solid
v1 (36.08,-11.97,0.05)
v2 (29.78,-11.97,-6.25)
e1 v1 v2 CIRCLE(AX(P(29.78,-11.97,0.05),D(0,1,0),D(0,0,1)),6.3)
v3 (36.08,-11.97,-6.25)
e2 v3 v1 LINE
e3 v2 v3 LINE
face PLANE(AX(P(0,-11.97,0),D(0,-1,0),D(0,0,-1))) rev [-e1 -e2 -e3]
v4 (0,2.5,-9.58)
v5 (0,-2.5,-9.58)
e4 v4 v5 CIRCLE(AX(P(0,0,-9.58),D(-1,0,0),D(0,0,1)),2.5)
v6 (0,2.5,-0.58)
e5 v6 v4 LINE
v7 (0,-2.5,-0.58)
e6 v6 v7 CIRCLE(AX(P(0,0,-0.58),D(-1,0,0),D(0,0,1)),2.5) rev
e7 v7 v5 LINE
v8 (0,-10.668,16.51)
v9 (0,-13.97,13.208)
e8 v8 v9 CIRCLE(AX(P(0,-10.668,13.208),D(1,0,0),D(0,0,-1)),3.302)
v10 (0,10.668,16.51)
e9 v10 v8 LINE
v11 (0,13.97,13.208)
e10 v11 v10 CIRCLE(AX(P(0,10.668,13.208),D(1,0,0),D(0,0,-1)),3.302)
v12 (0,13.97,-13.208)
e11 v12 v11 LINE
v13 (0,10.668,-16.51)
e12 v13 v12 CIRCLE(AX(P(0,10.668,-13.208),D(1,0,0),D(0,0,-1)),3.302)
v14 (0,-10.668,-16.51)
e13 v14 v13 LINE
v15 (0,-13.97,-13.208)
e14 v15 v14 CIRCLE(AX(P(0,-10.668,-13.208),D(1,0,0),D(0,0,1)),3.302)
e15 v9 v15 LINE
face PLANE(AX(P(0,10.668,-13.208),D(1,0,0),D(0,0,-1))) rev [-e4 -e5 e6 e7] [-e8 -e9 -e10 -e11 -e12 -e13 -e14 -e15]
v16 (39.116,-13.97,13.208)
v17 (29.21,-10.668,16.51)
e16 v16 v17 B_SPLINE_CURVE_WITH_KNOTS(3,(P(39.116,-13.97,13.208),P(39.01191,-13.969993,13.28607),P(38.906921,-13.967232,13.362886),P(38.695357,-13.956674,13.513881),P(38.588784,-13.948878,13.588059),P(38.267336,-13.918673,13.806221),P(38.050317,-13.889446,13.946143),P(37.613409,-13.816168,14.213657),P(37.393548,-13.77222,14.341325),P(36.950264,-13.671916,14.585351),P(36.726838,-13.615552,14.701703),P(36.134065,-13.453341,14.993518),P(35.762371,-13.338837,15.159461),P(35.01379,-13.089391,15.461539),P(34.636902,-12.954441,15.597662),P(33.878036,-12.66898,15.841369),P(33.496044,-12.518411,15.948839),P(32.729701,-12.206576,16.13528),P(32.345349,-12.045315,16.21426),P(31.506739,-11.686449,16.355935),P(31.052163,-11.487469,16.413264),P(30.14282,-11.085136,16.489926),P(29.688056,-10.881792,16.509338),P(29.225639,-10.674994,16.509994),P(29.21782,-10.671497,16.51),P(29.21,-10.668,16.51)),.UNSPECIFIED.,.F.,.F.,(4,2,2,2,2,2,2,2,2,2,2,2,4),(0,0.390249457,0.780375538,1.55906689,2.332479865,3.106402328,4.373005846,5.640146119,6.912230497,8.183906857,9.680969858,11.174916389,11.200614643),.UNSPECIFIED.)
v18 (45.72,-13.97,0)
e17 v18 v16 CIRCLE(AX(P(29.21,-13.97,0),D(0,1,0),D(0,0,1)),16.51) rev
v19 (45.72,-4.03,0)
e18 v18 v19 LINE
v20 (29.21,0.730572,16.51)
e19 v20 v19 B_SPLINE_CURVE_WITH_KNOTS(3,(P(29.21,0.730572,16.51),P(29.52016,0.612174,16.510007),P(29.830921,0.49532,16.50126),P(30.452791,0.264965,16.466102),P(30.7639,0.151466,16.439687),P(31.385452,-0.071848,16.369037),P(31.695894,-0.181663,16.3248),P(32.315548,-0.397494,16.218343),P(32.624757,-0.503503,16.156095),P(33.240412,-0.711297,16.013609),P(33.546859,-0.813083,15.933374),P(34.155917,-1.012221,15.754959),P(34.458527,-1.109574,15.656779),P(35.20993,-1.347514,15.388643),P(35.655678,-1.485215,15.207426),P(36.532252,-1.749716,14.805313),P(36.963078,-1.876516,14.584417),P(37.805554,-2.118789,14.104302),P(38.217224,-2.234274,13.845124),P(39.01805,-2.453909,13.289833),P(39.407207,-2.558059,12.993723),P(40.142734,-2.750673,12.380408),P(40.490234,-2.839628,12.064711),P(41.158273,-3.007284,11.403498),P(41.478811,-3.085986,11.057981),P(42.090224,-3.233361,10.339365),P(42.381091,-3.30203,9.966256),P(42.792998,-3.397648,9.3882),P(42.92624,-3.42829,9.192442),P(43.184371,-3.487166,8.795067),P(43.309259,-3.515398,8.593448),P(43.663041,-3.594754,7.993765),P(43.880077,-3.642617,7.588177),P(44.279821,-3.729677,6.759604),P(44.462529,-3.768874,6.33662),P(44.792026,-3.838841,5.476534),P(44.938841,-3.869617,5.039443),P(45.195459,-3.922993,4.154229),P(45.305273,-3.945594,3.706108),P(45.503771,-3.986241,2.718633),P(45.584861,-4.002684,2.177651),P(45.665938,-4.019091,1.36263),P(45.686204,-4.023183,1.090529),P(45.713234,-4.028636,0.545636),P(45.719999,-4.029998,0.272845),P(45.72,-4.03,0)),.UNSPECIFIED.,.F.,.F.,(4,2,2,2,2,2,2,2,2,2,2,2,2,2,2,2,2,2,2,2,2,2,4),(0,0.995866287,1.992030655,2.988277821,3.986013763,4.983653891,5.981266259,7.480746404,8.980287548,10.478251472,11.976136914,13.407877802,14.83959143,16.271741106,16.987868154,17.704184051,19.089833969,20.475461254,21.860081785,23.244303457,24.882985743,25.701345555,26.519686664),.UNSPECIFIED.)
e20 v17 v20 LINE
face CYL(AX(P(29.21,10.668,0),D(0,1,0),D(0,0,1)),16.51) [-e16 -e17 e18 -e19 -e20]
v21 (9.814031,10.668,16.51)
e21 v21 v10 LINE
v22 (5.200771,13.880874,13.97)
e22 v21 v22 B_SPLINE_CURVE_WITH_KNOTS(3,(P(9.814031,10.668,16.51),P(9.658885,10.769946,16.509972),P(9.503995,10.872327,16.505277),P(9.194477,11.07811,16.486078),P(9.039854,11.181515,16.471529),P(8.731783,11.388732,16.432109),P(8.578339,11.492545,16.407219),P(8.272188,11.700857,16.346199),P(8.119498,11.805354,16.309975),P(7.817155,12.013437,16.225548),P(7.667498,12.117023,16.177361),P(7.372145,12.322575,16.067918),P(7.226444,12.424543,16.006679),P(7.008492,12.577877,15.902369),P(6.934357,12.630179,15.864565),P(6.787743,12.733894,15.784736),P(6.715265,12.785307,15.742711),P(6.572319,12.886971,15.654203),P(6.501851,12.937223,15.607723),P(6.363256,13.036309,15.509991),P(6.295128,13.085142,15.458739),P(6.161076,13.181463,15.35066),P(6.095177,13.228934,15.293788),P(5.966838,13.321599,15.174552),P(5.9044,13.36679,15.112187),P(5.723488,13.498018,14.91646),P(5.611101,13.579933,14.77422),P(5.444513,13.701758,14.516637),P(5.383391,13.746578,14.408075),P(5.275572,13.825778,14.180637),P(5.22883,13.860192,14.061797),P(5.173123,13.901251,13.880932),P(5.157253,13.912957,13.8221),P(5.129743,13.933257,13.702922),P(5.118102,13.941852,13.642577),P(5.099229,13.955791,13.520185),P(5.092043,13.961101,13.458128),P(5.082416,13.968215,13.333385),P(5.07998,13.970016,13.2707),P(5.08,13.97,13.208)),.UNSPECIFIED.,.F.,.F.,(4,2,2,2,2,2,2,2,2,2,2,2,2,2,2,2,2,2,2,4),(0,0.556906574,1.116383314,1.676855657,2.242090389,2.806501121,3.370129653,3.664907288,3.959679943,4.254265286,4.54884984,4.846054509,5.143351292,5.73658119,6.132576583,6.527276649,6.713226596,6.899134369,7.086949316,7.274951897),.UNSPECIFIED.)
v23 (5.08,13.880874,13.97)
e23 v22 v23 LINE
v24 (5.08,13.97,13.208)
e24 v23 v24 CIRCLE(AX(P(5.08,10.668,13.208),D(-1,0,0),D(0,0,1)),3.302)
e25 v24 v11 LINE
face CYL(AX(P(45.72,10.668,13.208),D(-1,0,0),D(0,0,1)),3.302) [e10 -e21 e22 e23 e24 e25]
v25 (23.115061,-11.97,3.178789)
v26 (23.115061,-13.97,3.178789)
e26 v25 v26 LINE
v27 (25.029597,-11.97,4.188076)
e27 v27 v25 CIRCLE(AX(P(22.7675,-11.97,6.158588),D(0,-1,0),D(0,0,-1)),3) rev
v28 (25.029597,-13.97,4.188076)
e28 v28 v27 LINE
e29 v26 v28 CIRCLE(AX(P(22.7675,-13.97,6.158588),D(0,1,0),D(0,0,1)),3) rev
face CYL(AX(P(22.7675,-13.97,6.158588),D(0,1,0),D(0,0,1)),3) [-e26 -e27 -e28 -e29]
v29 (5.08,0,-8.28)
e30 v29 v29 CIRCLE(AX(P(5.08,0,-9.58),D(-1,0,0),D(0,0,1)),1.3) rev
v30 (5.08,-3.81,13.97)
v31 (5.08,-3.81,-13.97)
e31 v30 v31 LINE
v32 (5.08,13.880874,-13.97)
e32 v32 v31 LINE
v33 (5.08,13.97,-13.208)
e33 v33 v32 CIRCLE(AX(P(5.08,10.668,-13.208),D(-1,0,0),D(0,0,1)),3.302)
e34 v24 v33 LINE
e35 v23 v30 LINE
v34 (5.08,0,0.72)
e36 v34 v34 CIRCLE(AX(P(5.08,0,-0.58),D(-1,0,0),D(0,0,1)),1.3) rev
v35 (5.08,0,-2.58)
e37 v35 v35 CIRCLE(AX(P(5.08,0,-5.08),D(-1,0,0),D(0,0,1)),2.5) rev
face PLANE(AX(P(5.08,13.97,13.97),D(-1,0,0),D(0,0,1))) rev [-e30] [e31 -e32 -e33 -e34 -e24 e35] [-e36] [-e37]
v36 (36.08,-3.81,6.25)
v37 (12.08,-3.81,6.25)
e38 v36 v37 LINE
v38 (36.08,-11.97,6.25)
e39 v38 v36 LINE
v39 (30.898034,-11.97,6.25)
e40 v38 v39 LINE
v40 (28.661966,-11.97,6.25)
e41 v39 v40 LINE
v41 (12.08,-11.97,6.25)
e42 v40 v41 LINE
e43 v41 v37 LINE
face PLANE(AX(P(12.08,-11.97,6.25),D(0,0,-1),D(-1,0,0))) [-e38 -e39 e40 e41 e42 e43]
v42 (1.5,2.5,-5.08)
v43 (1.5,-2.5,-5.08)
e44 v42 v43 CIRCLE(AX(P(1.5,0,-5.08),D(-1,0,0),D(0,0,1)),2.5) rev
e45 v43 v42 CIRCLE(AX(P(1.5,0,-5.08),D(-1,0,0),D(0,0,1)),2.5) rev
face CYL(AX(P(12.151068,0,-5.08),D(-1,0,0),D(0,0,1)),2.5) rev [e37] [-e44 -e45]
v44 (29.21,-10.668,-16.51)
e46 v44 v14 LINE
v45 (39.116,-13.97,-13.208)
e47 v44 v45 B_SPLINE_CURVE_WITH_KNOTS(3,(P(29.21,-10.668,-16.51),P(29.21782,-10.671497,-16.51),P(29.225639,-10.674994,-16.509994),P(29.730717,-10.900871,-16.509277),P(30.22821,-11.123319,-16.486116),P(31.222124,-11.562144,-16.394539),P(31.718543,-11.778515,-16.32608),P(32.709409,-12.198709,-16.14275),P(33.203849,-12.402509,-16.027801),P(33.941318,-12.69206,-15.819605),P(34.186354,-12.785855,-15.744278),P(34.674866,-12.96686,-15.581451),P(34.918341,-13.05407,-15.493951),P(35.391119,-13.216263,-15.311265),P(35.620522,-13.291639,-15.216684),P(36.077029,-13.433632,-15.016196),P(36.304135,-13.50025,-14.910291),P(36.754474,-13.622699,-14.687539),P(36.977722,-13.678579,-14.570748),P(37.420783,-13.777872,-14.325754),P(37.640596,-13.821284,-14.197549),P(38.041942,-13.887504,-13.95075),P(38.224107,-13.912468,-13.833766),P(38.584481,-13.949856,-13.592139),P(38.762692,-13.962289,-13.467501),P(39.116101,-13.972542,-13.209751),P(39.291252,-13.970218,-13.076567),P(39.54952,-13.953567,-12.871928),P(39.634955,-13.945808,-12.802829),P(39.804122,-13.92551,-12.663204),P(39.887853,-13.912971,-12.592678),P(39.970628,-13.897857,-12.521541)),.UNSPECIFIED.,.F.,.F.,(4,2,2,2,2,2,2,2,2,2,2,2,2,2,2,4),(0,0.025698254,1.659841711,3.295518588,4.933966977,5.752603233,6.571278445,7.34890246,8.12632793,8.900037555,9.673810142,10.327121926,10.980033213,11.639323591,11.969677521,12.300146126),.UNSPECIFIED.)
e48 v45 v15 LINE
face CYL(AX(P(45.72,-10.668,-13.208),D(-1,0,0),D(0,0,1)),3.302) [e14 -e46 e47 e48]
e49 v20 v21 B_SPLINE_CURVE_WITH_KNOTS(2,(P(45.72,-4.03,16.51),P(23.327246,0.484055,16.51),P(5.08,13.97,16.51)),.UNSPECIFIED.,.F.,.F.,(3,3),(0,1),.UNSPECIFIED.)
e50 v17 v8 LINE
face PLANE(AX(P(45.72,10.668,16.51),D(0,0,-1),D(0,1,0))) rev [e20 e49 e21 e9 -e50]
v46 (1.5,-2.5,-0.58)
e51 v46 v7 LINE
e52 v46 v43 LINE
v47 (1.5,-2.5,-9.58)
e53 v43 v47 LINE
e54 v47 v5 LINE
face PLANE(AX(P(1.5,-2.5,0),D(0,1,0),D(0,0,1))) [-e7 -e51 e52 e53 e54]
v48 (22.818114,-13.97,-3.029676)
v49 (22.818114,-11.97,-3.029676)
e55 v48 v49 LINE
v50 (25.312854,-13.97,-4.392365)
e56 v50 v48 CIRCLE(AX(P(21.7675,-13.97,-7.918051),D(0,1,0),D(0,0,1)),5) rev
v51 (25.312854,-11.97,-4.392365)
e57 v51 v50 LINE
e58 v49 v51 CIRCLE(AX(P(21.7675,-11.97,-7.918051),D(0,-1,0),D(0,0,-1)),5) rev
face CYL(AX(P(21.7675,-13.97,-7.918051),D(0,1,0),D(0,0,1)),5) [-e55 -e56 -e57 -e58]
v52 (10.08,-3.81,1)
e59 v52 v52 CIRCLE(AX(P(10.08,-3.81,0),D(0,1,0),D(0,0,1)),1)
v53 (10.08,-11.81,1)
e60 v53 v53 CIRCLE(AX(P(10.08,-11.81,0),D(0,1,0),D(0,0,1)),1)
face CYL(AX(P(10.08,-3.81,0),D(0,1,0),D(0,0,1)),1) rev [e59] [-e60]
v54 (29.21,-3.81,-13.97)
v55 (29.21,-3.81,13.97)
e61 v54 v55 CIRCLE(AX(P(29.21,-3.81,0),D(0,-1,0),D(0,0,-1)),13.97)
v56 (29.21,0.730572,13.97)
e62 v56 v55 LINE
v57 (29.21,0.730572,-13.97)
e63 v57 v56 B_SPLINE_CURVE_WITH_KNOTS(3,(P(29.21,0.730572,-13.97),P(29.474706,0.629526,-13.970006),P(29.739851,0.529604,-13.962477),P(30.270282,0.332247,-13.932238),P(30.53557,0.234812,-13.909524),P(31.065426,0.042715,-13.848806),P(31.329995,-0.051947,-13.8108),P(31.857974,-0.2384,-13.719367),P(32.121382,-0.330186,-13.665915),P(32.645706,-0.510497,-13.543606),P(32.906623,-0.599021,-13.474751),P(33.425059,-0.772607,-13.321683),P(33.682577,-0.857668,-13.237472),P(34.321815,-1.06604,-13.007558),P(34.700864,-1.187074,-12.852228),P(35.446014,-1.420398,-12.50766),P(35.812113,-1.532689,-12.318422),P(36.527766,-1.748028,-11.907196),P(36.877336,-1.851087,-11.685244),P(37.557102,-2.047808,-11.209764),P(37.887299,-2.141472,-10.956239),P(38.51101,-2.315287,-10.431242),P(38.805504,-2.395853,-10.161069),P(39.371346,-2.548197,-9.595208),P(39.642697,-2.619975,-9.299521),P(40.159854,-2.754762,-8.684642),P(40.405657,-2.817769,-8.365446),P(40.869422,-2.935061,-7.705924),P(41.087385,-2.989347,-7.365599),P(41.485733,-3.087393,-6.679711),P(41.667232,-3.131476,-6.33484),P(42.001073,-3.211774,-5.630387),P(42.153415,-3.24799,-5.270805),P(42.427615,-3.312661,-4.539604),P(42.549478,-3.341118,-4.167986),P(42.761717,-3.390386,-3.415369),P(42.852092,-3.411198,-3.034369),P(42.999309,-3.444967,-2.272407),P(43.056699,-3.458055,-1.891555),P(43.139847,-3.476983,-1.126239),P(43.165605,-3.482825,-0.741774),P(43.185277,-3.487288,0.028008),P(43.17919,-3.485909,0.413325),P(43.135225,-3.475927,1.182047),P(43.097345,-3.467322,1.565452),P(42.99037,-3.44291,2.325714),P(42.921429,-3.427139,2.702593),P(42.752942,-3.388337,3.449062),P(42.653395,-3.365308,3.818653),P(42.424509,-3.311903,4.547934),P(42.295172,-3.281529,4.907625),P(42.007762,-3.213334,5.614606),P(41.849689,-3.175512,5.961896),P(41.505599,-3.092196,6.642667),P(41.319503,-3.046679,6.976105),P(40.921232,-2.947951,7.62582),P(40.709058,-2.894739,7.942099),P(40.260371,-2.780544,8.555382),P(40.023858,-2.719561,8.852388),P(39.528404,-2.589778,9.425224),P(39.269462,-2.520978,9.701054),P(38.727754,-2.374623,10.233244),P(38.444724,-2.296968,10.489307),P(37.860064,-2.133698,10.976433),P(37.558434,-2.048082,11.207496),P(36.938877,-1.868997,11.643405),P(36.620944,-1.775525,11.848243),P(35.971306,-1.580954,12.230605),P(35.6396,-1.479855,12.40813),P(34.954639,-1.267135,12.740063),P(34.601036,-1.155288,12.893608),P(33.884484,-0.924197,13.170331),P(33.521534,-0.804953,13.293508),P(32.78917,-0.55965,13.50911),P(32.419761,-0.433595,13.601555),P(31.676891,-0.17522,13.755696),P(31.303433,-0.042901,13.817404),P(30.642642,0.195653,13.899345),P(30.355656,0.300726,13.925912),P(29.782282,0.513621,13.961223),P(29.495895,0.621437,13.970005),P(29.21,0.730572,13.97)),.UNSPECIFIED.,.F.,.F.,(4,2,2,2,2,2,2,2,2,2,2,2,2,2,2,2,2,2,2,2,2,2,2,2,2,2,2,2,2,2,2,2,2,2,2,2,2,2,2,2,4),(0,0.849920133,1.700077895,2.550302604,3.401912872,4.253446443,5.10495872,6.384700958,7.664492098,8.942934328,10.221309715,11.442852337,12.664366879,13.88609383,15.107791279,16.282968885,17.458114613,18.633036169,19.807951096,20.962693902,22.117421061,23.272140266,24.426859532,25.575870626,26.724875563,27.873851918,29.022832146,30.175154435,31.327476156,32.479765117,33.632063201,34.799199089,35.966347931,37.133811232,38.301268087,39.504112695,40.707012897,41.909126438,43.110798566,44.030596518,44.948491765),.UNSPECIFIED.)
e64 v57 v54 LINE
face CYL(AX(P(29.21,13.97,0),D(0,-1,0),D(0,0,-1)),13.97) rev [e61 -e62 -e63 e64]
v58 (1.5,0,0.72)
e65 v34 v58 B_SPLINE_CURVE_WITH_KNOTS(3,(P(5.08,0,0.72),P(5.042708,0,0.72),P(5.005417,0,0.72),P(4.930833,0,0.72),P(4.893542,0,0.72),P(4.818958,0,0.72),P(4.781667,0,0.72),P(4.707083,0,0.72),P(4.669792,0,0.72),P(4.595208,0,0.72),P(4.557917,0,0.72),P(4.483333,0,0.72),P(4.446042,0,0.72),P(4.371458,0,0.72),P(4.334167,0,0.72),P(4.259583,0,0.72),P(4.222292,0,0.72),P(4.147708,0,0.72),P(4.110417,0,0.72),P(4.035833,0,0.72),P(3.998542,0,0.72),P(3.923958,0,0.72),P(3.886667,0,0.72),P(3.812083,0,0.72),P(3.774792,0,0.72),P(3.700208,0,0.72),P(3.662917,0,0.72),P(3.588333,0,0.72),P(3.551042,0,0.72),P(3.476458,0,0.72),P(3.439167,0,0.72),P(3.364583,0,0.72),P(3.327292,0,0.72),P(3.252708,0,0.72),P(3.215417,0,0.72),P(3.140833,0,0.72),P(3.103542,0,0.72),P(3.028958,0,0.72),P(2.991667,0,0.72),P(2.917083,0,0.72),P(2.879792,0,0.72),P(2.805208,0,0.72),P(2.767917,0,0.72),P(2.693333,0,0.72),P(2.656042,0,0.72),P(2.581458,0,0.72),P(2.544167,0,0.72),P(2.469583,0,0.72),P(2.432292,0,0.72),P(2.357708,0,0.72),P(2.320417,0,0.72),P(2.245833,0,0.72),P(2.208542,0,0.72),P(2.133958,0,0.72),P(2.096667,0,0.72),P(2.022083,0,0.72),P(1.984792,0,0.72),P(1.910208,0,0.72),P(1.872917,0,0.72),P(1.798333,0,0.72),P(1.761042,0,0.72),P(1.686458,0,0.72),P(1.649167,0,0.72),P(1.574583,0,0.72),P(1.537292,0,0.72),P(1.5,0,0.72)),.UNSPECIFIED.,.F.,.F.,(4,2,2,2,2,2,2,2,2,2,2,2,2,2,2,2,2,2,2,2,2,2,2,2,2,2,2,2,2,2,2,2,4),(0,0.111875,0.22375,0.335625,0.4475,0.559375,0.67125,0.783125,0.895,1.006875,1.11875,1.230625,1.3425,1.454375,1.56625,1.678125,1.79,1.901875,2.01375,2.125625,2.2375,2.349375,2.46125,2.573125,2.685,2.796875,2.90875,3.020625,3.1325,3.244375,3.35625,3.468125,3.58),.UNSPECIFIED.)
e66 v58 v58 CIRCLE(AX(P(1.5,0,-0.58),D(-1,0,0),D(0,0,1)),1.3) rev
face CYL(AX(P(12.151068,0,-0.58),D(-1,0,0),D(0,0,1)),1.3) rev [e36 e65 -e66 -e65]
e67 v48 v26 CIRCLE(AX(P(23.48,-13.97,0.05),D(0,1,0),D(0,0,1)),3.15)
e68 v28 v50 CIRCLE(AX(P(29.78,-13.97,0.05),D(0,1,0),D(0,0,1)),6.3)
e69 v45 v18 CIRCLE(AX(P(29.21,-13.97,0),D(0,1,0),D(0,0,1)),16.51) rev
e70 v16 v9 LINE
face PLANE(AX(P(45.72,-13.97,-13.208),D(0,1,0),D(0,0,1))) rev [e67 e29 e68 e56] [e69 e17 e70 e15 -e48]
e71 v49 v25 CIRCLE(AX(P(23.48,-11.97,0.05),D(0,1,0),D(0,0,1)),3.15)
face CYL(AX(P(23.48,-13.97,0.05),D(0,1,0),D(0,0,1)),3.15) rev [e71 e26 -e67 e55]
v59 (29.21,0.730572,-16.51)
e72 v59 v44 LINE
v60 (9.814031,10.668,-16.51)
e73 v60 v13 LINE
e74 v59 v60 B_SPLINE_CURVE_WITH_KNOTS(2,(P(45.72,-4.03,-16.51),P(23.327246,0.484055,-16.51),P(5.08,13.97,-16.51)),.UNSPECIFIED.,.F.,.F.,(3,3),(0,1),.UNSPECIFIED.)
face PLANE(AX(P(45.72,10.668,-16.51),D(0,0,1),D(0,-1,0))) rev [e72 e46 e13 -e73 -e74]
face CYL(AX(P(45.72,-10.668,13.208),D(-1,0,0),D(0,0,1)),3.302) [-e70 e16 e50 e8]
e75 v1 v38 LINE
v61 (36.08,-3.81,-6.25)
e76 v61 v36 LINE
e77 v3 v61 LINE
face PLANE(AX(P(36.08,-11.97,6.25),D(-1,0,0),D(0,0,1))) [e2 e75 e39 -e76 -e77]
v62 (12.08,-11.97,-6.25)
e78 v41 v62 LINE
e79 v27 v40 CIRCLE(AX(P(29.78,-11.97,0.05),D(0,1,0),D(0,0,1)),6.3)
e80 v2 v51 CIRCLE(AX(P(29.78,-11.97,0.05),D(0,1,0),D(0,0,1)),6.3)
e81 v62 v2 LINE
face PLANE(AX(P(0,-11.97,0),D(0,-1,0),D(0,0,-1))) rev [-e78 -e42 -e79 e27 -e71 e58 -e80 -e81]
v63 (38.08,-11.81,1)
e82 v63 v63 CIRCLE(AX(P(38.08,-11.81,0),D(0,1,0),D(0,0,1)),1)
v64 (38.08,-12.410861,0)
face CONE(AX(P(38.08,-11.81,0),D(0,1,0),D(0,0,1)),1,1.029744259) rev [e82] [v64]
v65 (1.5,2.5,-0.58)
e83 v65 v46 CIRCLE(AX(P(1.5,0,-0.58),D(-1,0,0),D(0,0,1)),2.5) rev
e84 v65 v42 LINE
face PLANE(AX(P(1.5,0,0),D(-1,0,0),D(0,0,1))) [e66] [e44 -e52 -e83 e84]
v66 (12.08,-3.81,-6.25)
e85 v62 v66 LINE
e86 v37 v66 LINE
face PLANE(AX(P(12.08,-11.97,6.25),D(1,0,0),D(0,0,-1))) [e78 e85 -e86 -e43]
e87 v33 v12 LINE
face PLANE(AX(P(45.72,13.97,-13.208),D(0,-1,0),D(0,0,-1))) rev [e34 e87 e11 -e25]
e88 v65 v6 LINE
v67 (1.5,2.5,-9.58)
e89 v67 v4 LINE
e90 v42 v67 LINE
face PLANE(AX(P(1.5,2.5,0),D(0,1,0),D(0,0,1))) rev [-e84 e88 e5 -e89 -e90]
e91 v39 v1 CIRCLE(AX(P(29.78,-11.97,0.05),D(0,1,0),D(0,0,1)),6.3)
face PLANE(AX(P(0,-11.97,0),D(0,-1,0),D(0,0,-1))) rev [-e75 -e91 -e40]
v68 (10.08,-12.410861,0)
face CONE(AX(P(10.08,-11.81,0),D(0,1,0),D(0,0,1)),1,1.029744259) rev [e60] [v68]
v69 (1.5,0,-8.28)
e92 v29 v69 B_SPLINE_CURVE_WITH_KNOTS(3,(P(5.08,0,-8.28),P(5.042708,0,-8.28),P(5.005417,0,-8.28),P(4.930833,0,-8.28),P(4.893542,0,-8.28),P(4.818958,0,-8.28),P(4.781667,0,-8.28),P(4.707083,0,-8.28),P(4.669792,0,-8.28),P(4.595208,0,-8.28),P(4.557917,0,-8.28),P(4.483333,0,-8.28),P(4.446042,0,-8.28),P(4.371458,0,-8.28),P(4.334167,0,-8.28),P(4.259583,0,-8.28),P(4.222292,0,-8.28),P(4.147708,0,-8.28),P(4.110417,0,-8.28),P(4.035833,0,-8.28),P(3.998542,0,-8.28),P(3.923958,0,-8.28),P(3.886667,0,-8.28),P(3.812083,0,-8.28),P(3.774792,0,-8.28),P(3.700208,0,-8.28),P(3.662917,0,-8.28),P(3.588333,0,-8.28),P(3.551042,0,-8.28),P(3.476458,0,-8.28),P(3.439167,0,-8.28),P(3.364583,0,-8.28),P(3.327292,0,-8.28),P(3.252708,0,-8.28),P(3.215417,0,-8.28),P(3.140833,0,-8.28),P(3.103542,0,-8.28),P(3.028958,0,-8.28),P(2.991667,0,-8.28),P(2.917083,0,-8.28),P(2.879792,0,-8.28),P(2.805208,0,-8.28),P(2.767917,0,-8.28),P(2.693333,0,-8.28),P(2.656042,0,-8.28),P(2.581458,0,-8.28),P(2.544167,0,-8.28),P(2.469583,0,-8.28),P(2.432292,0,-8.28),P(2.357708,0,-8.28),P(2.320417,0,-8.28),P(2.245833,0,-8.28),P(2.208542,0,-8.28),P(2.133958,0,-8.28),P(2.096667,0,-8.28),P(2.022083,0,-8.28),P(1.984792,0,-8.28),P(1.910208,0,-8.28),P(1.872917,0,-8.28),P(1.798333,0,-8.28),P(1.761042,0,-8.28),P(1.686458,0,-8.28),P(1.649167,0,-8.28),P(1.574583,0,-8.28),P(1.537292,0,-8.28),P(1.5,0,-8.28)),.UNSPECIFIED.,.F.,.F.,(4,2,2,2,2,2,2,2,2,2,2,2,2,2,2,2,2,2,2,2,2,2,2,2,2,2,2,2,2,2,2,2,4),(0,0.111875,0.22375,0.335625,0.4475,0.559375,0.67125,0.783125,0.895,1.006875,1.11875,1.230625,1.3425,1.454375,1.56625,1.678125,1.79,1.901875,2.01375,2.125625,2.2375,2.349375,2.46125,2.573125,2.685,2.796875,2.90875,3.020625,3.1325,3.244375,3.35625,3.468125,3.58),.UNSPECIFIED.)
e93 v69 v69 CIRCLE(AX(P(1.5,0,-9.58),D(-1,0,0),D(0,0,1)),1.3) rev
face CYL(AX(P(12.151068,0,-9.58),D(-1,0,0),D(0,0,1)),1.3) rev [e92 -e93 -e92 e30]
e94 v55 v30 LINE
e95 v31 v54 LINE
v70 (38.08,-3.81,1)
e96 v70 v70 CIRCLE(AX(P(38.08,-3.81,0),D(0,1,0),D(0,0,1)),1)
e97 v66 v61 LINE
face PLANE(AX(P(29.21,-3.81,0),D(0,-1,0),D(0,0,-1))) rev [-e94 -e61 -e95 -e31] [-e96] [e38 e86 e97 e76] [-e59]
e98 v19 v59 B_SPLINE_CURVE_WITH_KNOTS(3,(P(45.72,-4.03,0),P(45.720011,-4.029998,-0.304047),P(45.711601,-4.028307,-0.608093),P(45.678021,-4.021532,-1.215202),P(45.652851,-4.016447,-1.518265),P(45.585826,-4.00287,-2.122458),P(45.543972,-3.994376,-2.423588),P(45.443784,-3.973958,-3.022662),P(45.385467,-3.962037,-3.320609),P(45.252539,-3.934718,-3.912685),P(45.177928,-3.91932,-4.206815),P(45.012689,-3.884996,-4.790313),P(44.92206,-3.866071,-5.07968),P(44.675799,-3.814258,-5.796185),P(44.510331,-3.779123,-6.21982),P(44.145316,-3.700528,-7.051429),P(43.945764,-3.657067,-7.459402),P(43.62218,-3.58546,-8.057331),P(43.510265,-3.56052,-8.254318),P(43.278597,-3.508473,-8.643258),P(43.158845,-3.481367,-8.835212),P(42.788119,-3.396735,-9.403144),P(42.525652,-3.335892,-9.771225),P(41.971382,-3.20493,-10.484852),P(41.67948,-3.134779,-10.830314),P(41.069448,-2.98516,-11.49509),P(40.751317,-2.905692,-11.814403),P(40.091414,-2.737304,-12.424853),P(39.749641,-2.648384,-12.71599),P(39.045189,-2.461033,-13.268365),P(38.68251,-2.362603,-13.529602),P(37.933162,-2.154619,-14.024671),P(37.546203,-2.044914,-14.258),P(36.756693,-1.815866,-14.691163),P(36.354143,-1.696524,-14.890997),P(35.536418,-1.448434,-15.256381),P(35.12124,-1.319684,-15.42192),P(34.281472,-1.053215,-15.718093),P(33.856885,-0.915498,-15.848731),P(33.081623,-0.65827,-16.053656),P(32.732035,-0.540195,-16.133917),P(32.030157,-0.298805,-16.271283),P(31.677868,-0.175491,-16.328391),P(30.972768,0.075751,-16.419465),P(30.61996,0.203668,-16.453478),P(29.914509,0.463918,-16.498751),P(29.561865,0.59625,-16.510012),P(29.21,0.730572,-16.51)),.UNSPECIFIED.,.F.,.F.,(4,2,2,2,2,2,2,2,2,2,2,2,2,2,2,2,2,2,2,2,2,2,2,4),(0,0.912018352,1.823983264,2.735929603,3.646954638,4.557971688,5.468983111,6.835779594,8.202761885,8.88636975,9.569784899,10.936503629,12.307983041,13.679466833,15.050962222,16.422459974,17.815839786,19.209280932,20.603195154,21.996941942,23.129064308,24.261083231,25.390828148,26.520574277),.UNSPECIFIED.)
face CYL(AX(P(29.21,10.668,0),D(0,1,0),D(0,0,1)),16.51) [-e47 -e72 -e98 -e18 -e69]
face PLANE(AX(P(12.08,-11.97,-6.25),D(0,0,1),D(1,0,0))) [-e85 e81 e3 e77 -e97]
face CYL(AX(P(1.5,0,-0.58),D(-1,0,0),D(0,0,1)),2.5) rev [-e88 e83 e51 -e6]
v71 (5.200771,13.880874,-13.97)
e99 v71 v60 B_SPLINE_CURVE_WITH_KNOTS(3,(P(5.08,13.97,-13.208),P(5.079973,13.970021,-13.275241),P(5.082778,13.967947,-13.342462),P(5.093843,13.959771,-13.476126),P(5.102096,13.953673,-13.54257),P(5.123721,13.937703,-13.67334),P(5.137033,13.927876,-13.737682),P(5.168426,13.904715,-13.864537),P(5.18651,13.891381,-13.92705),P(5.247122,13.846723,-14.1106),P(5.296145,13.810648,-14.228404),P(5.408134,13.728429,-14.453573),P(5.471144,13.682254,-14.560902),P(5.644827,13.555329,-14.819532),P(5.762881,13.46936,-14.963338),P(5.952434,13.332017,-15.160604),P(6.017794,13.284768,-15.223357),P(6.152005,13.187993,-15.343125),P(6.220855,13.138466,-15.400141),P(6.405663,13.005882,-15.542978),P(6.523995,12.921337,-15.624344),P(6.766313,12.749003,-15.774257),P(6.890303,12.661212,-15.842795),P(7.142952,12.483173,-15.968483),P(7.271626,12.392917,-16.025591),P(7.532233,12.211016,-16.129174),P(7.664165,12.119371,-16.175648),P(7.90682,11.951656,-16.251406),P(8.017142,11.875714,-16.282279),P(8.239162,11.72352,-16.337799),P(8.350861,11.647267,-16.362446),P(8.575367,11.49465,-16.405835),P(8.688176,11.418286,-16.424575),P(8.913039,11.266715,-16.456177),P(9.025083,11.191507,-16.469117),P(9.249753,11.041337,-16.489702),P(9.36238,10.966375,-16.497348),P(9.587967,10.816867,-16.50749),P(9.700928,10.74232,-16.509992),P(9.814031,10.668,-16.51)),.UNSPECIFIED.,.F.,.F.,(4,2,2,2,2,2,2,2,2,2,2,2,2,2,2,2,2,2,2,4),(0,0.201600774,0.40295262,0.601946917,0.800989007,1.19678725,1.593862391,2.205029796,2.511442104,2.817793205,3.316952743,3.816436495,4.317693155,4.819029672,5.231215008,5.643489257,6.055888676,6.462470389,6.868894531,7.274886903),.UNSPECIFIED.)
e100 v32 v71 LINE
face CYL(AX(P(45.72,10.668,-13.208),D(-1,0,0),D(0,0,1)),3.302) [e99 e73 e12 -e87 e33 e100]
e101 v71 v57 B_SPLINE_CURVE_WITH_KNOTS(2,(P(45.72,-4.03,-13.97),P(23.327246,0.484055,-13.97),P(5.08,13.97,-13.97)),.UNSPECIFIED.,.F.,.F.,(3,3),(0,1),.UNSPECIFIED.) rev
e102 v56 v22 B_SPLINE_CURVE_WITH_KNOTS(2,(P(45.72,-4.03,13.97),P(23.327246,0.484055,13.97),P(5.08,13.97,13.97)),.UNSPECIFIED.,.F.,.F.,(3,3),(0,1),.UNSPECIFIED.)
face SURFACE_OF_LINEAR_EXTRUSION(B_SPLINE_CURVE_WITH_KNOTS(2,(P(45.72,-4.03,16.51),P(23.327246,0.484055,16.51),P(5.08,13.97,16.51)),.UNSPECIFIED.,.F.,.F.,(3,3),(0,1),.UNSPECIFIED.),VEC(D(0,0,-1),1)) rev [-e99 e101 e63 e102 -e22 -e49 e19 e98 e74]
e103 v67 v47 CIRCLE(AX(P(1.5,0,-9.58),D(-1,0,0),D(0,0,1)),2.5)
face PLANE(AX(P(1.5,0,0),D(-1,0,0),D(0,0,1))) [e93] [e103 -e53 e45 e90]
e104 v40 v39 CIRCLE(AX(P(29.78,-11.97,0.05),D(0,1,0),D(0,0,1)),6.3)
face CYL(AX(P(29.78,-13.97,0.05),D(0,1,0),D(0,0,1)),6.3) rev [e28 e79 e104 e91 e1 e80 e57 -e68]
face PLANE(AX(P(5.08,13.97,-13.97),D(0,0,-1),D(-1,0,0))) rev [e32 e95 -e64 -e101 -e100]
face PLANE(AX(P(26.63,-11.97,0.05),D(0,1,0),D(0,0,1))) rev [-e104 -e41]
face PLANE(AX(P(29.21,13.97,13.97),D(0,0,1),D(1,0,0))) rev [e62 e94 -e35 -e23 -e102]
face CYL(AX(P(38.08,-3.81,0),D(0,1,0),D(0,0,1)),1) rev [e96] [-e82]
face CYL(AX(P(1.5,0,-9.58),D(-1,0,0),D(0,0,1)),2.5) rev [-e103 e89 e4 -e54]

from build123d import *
from OCP.BRepFilletAPI import BRepFilletAPI_MakeFillet

# Parameters (mm, degrees)
BOSS_EXTRUDE1_DEPTH       = 45.72
CUT_EXTRUDE1_DEPTH        = 59.101632507
FILLET2_R                 = 16.51
FILLET3_R                 = 16.51
SKETCH3_OUTSIDE_W         = 60.308
SKETCH3_OUTSIDE_H         = 47.608
CUT_EXTRUDE2_DEPTH        = 52.759317573
SKETCH5_W                 = 24.000000006
SKETCH5_H                 = 12.5
CUT_EXTRUDE3_DEPTH        = 8.16
CUT_EXTRUDE4_DEPTH        = 56.097932423
FILLET4_R1                = 3
FILLET4_R2                = 5
F_2_0MM_DOWEL_HOLE1_D     = 2
F_2_0MM_DOWEL_HOLE1_DEPTH = 8
F_2_0MM_DOWEL_HOLE1_TIP   = 0.600860619
SKETCH11_R                = 2.5
SKETCH11_R_2              = 1.3
CUT_EXTRUDE6_DEPTH        = 5.08
CUT_EXTRUDE7_DEPTH        = 1.5


with BuildPart() as part:
    # Sketch1 → Boss-Extrude1 (new body)
    with BuildSketch(Plane.YZ):
        with BuildLine():
            Line((10.668, -16.51), (-10.668, -16.51))
            ThreePointArc((-10.668, -16.51), (-13.002866591, -15.542866591), (-13.97, -13.208))
            Line((-13.97, -13.208), (-13.97, 13.208))
            ThreePointArc((-13.97, 13.208), (-13.002866591, 15.542866591), (-10.668, 16.51))
            Line((-10.668, 16.51), (10.668, 16.51))
            ThreePointArc((10.668, 16.51), (13.002866591, 15.542866591), (13.97, 13.208))
            Line((13.97, 13.208), (13.97, -13.208))
            ThreePointArc((13.97, -13.208), (13.002866591, -15.542866591), (10.668, -16.51))
        make_face()
    extrude(amount=BOSS_EXTRUDE1_DEPTH)

    # Sketch2 → Cut-Extrude1 (cut, through all)
    with BuildSketch(Plane(origin=(0, 0, -16.51), x_dir=(1, 0, 0), z_dir=(0, 0, -1))):
        with BuildLine():
            Line((5.08, -13.97), (45.72, -13.97))
            Line((45.72, -13.97), (45.72, 4.03))
            add(Edge.make_bspline(
                [(5.08, -13.97), (23.327246471, -0.48405524), (45.72, 4.03)],
                knots=[0, 0, 0, 1, 1, 1], degree=2))
        make_face()
    extrude(amount=-CUT_EXTRUDE1_DEPTH, mode=Mode.SUBTRACT)

    # Fillet2
    # the kernel refuses this fillet: 16.51 mm, written as the material it takes off along each edge
    with BuildSketch(Plane(origin=(45.72, 37.245, -16.51), x_dir=(-1, 0, 0), z_dir=(0, -1, 0))) as fillet2_piece_1:
        with BuildLine():
            CenterArc((FILLET2_R, -FILLET2_R), FILLET2_R, 90, 90)
            Line((0, -FILLET2_R), (0, 0))
            Line((0, 0), (FILLET2_R, 0))
        make_face()
    extrude(amount=89.188, mode=Mode.SUBTRACT)

    # Fillet3
    # the kernel refuses this fillet: 16.51 mm, written as the material it takes off along each edge
    with BuildSketch(Plane(origin=(45.72, -51.943, 16.51), x_dir=(-1, 0, 0), z_dir=(0, 1, 0))) as fillet3_piece_1:
        with BuildLine():
            CenterArc((FILLET3_R, -FILLET3_R), FILLET3_R, 90, 90)
            Line((0, -FILLET3_R), (0, 0))
            Line((0, 0), (FILLET3_R, 0))
        make_face()
    extrude(amount=89.188, mode=Mode.SUBTRACT)

    # Sketch3 outside → Cut-Extrude2 (cut, through all)
    # profile 1 of 2: a face of its own
    with BuildSketch(Plane(origin=(0, -3.81, 0), x_dir=(-1, 0, 0), z_dir=(0, -1, 0))):
        with Locations((-22.86, 0)):
            Rectangle(SKETCH3_OUTSIDE_W, SKETCH3_OUTSIDE_H)
        with BuildLine():
            Line((-29.21, -16.51), (0, -16.51))
            Line((0, -16.51), (0, 16.51))
            Line((0, 16.51), (-29.21, 16.51))
            ThreePointArc((-29.21, 16.51), (-45.72, 0), (-29.21, -16.51))
        make_face(mode=Mode.SUBTRACT)
    # profile 2 of 2: a face of its own
    with BuildSketch(Plane(origin=(0, -3.81, 0), x_dir=(-1, 0, 0), z_dir=(0, -1, 0))):
        with BuildLine():
            Line((-29.21, -13.97), (-5.08, -13.97))
            Line((-5.08, -13.97), (-5.08, 13.97))
            Line((-5.08, 13.97), (-29.21, 13.97))
            ThreePointArc((-29.21, 13.97), (-43.18, 0), (-29.21, -13.97))
        make_face()
    extrude(amount=-CUT_EXTRUDE2_DEPTH, mode=Mode.SUBTRACT)

    # Sketch5 → Cut-Extrude3 (cut)
    with BuildSketch(Plane(origin=(0, -3.81, 0), x_dir=(-1, 0, 0), z_dir=(0, -1, 0))):
        with Locations((-24.080000003, 0)):
            Rectangle(SKETCH5_W, SKETCH5_H)
    extrude(amount=CUT_EXTRUDE3_DEPTH, mode=Mode.SUBTRACT)

    # Sketch6 → Cut-Extrude4 (cut, through all)
    with BuildSketch(Plane(origin=(0, -11.97, 0), x_dir=(-1, 0, 0), z_dir=(0, 1, 0))):
        with BuildLine():
            ThreePointArc((-24.267500006, 3.099974385), (-36.080000006, 0.05), (-24.267500006, -2.999974385))
            ThreePointArc((-24.267500006, -2.999974385), (-20.330000006, 0.05), (-24.267500006, 3.099974385))
        make_face()
    extrude(amount=-CUT_EXTRUDE4_DEPTH, mode=Mode.SUBTRACT)

    # Fillet4: one fillet with a radius per group of edges: ONE call of the kernel's fillet builder (fillet() takes one radius for all edges)
    fillet4_edges_1 = [part.edges().sort_by_distance(p)[0] for p in [
        (24.267500006, -12.97, 3.099974385),
    ]]
    fillet4_edges_2 = [part.edges().sort_by_distance(p)[0] for p in [
        (24.267500006, -12.97, -2.999974385),
    ]]
    fillet4 = BRepFilletAPI_MakeFillet(part.part.solid().wrapped)
    for e in fillet4_edges_1:
        fillet4.Add(FILLET4_R1, e.wrapped)
    for e in fillet4_edges_2:
        fillet4.Add(FILLET4_R2, e.wrapped)
    add(Compound.cast(fillet4.Shape()), mode=Mode.REPLACE)

    # Ø2.0mm Dowel Hole1
    with Locations(Plane(origin=(0, -3.81, 0), x_dir=(-1, 0, 0), z_dir=(0, 1, 0))):
        with Locations((-10.08, 0), (-38.080000006, 0)):
            Hole(F_2_0MM_DOWEL_HOLE1_D / 2, depth=F_2_0MM_DOWEL_HOLE1_DEPTH)
            with Locations((0, 0, -(F_2_0MM_DOWEL_HOLE1_DEPTH + F_2_0MM_DOWEL_HOLE1_TIP / 2))):  # 118° drill point
                Cone(0, F_2_0MM_DOWEL_HOLE1_D / 2, F_2_0MM_DOWEL_HOLE1_TIP, mode=Mode.SUBTRACT)

    # Sketch11 → Cut-Extrude6 (cut)
    with BuildSketch(Plane(origin=(0, 0, 0), x_dir=(0, -1, 0), z_dir=(-1, 0, 0))):
        with Locations(Location((0, -5.08, 0), (0, 0, 90))):
            Circle(SKETCH11_R)
        with Locations(Location((0, -0.58, 0), (0, 0, 90))):
            Circle(SKETCH11_R_2)
        with Locations(Location((0, -9.58, 0), (0, 0, 90))):
            Circle(SKETCH11_R_2)
    extrude(amount=-CUT_EXTRUDE6_DEPTH, mode=Mode.SUBTRACT)

    # Sketch12 → Cut-Extrude7 (cut)
    with BuildSketch(Plane(origin=(0, 0, 0), x_dir=(0, -1, 0), z_dir=(-1, 0, 0))):
        with BuildLine():
            Line((1.3, -9.58), (2.5, -9.58))
            ThreePointArc((2.5, -9.58), (2.118290802, -8.252278614), (1.089724736, -7.33))
            ThreePointArc((1.089724736, -7.33), (0, -7.58), (-1.089724736, -7.33))
            ThreePointArc((-1.089724736, -7.33), (-2.118290802, -8.252278614), (-2.5, -9.58))
            Line((-2.5, -9.58), (-1.3, -9.58))
            ThreePointArc((-1.3, -9.58), (0, -8.28), (1.3, -9.58))
        make_face()
        with BuildLine():
            Line((2.5, -5.08), (2.5, -0.58))
            ThreePointArc((2.5, -0.58), (2.118290802, -1.907721386), (1.089724736, -2.83))
            ThreePointArc((1.089724736, -2.83), (2.118290802, -3.752278614), (2.5, -5.08))
        make_face()
        with BuildLine():
            Line((2.5, -9.58), (2.5, -5.08))
            ThreePointArc((2.5, -5.08), (2.118290802, -6.407721386), (1.089724736, -7.33))
            ThreePointArc((1.089724736, -7.33), (2.118290802, -8.252278614), (2.5, -9.58))
        make_face()
        with BuildLine():
            ThreePointArc((-1.089724736, -7.33), (-2.118290802, -6.407721386), (-2.5, -5.08))
            Line((-2.5, -5.08), (-2.5, -9.58))
            ThreePointArc((-2.5, -9.58), (-2.118290802, -8.252278614), (-1.089724736, -7.33))
        make_face()
        with BuildLine():
            ThreePointArc((-1.089724736, -2.83), (-2.118290802, -1.907721386), (-2.5, -0.58))
            Line((-2.5, -0.58), (-2.5, -5.08))
            ThreePointArc((-2.5, -5.08), (-2.118290802, -3.752278614), (-1.089724736, -2.83))
        make_face()
        with BuildLine():
            ThreePointArc((1.089724736, -2.83), (2.118290802, -1.907721386), (2.5, -0.58))
            Line((2.5, -0.58), (1.3, -0.58))
            ThreePointArc((1.3, -0.58), (0, -1.88), (-1.3, -0.58))
            Line((-1.3, -0.58), (-2.5, -0.58))
            ThreePointArc((-2.5, -0.58), (-2.118290802, -1.907721386), (-1.089724736, -2.83))
            ThreePointArc((-1.089724736, -2.83), (0, -2.58), (1.089724736, -2.83))
        make_face()
        with BuildLine():
            Line((1.3, -0.58), (2.5, -0.58))
            ThreePointArc((2.5, -0.58), (0, 1.92), (-2.5, -0.58))
            Line((-2.5, -0.58), (-1.3, -0.58))
            ThreePointArc((-1.3, -0.58), (0, 0.72), (1.3, -0.58))
        make_face()
        with BuildLine():
            ThreePointArc((-2.5, -9.58), (0, -12.08), (2.5, -9.58))
            Line((2.5, -9.58), (1.3, -9.58))
            ThreePointArc((1.3, -9.58), (0, -10.88), (-1.3, -9.58))
            Line((-1.3, -9.58), (-2.5, -9.58))
        make_face()
    extrude(amount=-CUT_EXTRUDE7_DEPTH, mode=Mode.SUBTRACT)


solid = part.part
